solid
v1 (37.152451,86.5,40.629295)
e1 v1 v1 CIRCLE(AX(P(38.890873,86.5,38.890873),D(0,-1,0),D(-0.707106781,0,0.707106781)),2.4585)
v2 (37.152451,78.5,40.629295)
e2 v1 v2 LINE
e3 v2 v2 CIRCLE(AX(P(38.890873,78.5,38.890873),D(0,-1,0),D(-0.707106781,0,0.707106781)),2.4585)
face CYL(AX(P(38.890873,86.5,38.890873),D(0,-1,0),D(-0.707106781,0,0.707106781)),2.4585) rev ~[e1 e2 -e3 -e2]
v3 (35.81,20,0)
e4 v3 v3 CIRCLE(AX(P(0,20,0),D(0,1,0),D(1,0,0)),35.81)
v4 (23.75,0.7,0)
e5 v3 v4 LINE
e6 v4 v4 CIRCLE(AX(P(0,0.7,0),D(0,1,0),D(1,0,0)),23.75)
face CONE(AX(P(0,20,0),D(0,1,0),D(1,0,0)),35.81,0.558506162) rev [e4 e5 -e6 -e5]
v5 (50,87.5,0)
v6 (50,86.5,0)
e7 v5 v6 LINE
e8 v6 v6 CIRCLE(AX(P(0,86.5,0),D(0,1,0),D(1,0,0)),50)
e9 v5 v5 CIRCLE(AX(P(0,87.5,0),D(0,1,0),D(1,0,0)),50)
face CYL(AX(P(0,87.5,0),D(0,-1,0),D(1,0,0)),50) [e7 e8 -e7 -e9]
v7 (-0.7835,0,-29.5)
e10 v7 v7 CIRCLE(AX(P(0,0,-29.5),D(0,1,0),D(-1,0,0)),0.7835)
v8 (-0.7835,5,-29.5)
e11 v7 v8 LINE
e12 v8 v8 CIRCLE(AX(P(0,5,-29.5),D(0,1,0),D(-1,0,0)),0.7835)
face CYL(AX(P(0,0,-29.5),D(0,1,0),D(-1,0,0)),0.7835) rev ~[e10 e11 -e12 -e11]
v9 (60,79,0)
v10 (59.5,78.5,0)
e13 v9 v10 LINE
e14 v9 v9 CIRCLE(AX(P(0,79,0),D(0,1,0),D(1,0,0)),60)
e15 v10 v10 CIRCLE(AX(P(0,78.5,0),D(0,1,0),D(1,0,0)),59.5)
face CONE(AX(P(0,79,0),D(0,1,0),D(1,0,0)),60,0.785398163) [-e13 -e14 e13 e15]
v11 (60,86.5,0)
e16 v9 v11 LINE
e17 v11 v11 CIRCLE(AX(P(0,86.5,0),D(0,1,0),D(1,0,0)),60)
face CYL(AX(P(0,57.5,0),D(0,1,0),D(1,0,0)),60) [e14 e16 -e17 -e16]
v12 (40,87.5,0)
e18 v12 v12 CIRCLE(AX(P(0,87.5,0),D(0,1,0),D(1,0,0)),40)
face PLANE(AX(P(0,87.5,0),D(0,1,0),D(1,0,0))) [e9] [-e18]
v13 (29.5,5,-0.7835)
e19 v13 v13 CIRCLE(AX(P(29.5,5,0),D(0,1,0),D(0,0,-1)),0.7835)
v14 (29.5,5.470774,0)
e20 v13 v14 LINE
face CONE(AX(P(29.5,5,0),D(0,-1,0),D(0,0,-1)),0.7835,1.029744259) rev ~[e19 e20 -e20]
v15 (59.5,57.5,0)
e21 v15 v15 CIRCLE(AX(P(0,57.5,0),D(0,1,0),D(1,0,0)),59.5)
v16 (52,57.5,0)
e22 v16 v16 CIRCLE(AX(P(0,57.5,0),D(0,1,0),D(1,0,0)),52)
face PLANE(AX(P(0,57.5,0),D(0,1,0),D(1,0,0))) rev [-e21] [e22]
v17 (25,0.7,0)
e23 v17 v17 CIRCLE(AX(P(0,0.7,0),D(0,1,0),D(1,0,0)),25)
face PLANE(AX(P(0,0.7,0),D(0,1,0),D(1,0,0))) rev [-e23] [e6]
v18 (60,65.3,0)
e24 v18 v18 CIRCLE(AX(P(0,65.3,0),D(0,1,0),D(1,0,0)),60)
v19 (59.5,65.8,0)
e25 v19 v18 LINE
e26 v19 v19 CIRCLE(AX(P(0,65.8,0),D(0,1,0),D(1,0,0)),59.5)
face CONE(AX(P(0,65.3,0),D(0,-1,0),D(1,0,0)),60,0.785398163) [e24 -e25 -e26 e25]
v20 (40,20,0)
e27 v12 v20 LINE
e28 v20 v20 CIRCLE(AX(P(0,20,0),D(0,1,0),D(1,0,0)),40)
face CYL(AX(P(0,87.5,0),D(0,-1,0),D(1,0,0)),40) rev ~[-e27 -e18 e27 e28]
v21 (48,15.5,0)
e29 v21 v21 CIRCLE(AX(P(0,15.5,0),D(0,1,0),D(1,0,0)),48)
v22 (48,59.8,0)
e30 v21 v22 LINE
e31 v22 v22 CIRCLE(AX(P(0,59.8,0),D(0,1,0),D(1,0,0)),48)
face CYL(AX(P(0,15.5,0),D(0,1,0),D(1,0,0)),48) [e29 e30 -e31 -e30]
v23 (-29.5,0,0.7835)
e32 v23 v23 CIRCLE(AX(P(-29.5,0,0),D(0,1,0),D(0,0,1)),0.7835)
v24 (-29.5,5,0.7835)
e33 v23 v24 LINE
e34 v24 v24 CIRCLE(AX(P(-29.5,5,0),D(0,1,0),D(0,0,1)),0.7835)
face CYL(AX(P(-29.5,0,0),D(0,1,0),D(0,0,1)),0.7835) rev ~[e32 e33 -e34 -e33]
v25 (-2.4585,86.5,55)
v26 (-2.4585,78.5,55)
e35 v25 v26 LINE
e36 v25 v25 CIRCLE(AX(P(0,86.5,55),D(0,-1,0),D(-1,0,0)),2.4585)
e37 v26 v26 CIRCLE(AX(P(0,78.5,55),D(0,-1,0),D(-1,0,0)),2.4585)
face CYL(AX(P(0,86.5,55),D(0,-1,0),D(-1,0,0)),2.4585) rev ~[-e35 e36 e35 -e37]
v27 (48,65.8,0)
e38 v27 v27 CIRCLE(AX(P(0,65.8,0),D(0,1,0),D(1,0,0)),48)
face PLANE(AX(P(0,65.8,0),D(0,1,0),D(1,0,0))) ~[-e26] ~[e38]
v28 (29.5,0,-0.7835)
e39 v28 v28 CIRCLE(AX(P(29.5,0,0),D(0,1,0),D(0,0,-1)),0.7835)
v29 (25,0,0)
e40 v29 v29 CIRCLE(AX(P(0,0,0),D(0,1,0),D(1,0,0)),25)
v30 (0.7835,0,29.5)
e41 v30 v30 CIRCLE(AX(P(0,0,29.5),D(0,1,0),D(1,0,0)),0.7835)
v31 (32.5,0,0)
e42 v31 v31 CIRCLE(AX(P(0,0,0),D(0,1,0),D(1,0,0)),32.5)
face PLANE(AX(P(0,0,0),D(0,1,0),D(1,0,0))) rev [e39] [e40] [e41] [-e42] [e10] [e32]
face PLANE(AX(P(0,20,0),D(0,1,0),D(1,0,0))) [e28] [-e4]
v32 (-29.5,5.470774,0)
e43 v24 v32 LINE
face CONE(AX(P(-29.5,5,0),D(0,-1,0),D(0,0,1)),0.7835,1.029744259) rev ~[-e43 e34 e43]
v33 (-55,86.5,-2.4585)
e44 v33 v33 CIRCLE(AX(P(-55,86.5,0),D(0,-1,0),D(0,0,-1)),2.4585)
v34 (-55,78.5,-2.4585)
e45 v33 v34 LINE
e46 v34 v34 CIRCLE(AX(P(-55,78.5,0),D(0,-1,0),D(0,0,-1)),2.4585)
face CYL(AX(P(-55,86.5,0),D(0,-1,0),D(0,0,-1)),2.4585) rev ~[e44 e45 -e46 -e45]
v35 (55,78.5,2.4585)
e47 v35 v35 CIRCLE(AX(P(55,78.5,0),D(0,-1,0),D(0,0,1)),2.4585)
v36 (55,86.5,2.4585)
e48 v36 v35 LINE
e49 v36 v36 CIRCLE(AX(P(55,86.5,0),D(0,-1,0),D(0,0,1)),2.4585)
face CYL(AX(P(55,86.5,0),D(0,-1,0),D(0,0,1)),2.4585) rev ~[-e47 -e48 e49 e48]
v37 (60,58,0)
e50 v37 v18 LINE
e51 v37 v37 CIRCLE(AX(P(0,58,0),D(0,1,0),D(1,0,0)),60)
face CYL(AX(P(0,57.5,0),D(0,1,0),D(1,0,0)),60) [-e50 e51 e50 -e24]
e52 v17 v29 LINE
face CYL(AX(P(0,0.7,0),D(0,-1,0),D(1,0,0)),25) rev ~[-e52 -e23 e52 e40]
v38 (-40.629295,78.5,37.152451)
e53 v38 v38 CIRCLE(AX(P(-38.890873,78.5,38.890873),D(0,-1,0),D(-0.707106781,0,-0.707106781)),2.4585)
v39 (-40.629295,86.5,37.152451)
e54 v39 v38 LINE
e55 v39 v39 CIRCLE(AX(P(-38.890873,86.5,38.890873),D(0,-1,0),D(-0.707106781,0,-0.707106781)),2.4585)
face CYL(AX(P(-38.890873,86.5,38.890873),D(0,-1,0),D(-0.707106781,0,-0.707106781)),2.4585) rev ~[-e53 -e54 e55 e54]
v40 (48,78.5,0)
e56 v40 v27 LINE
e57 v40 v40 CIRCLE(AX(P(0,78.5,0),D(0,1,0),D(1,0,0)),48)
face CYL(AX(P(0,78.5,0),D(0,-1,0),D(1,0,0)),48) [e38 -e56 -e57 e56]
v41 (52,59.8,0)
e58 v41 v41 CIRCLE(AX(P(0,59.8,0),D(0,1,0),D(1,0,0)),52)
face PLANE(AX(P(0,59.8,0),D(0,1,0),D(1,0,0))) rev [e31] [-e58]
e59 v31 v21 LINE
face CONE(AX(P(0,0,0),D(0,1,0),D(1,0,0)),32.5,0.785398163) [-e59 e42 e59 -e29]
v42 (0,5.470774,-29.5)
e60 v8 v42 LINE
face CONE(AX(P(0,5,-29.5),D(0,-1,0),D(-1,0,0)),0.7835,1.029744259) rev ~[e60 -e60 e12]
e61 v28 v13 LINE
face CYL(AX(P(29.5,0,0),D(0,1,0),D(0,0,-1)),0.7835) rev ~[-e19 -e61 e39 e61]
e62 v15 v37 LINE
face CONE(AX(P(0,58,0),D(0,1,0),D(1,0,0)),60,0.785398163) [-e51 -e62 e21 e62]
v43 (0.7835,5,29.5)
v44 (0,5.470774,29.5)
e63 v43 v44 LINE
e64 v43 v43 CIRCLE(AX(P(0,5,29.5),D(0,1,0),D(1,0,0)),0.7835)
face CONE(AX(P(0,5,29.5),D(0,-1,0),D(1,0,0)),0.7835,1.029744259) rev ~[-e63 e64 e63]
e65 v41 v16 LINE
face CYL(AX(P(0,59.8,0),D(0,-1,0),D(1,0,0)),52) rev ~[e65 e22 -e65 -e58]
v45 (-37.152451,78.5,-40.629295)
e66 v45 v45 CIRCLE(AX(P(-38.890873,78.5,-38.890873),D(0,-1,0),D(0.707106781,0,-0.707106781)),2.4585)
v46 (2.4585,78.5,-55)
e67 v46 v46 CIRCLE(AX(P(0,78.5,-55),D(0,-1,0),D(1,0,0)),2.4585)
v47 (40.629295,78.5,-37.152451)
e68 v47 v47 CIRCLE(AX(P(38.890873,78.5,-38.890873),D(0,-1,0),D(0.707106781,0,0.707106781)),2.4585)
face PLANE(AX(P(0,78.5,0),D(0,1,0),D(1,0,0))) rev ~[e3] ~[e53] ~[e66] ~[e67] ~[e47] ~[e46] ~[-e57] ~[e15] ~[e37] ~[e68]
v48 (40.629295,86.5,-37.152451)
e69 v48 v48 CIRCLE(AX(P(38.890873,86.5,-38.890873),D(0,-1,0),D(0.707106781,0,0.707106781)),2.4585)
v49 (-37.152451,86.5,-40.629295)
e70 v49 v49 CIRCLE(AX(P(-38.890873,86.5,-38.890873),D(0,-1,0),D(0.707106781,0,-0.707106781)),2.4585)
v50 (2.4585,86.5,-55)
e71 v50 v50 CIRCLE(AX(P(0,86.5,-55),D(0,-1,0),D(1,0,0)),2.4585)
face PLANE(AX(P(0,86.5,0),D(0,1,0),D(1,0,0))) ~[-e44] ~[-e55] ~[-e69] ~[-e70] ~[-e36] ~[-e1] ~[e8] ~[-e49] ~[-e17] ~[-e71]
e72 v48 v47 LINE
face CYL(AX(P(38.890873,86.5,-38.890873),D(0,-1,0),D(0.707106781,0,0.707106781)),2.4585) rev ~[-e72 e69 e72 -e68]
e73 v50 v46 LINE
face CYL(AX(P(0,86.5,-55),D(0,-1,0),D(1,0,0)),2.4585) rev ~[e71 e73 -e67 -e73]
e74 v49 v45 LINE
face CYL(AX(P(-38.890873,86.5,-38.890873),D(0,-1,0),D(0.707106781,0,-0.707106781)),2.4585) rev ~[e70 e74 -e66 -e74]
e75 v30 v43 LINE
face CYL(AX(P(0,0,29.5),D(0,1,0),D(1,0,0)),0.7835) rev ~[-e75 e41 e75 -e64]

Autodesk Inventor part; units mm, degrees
ref_plane "YZ Plane" through (0, 0, 0) normal (1, 0, 0) x (0, 1, 0)
ref_plane "XZ Plane" through (0, 0, 0) normal (0, 1, 0) x (-1, 0, 0)
ref_plane "XY Plane" through (0, 0, 0) normal (0, 0, 1) x (1, 0, 0)
sketch "Sketch1" plane through (0, 0, 0) normal (0, 0, 1) x (1, 0, 0)
  line L0 (23.75, 0.7) -> (25, 0.7)
  line L1 (25, 0.7) -> (25, 0)
  line L2 (25, 0) -> (32.5, 0)
  line L3 (32.5, 0) -> (48, 15.5)
  line L4 (48, 15.5) -> (48, 57.5)
  line L5 (48, 57.5) -> (60, 57.5)
  line L6 (60, 57.5) -> (60, 87.5)
  line L7 (60, 87.5) -> (40, 87.5)
  line L8 (40, 87.5) -> (40, 20)
  line L9 (40, 20) -> (35.81, 20)
  line L10 (35.81, 20) -> (23.75, 0.7)
  line L11 (0, 0) -> (0, 69.5074) construction
  line L12 (50, 87.5) -> (50, 86.5)
  line L13 (50, 86.5) -> (60, 86.5)
  line L14 (48, 57.5) -> (48, 59.8)
  line L15 (48, 59.8) -> (52, 59.8)
  line L16 (52, 59.8) -> (52, 57.5)
  line L17 (60, 78.5) -> (48, 78.5)
  line L18 (48, 78.5) -> (48, 65.8)
  line L19 (48, 65.8) -> (60, 65.8)
  dimension "d0" = 135
  dimension "d2" = 80
  dimension "d3" = 50
  dimension "d4" = 47.5
  dimension "d5" = 65
  dimension "d6" = 20
  dimension "d9" = 30
  dimension "d10" = 120
  dimension "d11" = 0.7
  dimension "d13" = 122
  dimension "d26" = 1
  dimension "d27" = 100
  dimension "d28" = 96
  dimension "d29" = 4
  dimension "d30" = 2.3
  dimension "d31" = 87.5
  dimension "d32" = 6
  dimension "d33" = 8
revolve "Revolution1" add sketch "Sketch1" angle 360 about axis through (0, 0, 0) along (0, 1, 0) contours L10 L9 L8 L7 L12 L13 L6 L17 L18 L19 L5 L16 L15 L14 L4 L3 L2 L1 L0
sketch "Sketch2" plane through (0, 86.5, 0) normal (0, 1, 0) x (1, 0, 0)
  circle A0 centre (55, 0) radius 4
  point P0 (0, 0)
  dimension "d14" = 55
  dimension "d25" = 8
hole "Hole1" at (55, 86.5, 0) direction (0, -1, 0) diameter 4.917 depth 8 thread size "M6x1" class "6H" standard "ISO Metric profile"
pattern_circular "Circular Pattern1" count 8 over 360 about axis through (0, 37.65, 0) along (0, -1, 0) of "Hole1"
chamfer "Chamfer1" distance 0.5 angle 45 3 edges at (-60, 65.8, 0) (-60, 57.5, 0) (-60, 78.5, 0)
sketch "Sketch3" plane through (0, 0, 0) normal (0, -1, 0) x (1, 0, 0)
  point P0 (0, 0)
  point P1 (29.5, 0)
  dimension "d37" = 29.5
hole "Hole2" at (29.5, 0, 0) direction (0, 1, 0) diameter 1.567 depth 5 tip angle 118 thread size "M2x0.4" class "6H" standard "ISO Metric profile"
pattern_circular "Circular Pattern2" count 4 over 360 about axis through (0, 37.65, 0) along (0, -1, 0) of "Hole2"
properties part number "003" material "Stainless Steel, 440C"
